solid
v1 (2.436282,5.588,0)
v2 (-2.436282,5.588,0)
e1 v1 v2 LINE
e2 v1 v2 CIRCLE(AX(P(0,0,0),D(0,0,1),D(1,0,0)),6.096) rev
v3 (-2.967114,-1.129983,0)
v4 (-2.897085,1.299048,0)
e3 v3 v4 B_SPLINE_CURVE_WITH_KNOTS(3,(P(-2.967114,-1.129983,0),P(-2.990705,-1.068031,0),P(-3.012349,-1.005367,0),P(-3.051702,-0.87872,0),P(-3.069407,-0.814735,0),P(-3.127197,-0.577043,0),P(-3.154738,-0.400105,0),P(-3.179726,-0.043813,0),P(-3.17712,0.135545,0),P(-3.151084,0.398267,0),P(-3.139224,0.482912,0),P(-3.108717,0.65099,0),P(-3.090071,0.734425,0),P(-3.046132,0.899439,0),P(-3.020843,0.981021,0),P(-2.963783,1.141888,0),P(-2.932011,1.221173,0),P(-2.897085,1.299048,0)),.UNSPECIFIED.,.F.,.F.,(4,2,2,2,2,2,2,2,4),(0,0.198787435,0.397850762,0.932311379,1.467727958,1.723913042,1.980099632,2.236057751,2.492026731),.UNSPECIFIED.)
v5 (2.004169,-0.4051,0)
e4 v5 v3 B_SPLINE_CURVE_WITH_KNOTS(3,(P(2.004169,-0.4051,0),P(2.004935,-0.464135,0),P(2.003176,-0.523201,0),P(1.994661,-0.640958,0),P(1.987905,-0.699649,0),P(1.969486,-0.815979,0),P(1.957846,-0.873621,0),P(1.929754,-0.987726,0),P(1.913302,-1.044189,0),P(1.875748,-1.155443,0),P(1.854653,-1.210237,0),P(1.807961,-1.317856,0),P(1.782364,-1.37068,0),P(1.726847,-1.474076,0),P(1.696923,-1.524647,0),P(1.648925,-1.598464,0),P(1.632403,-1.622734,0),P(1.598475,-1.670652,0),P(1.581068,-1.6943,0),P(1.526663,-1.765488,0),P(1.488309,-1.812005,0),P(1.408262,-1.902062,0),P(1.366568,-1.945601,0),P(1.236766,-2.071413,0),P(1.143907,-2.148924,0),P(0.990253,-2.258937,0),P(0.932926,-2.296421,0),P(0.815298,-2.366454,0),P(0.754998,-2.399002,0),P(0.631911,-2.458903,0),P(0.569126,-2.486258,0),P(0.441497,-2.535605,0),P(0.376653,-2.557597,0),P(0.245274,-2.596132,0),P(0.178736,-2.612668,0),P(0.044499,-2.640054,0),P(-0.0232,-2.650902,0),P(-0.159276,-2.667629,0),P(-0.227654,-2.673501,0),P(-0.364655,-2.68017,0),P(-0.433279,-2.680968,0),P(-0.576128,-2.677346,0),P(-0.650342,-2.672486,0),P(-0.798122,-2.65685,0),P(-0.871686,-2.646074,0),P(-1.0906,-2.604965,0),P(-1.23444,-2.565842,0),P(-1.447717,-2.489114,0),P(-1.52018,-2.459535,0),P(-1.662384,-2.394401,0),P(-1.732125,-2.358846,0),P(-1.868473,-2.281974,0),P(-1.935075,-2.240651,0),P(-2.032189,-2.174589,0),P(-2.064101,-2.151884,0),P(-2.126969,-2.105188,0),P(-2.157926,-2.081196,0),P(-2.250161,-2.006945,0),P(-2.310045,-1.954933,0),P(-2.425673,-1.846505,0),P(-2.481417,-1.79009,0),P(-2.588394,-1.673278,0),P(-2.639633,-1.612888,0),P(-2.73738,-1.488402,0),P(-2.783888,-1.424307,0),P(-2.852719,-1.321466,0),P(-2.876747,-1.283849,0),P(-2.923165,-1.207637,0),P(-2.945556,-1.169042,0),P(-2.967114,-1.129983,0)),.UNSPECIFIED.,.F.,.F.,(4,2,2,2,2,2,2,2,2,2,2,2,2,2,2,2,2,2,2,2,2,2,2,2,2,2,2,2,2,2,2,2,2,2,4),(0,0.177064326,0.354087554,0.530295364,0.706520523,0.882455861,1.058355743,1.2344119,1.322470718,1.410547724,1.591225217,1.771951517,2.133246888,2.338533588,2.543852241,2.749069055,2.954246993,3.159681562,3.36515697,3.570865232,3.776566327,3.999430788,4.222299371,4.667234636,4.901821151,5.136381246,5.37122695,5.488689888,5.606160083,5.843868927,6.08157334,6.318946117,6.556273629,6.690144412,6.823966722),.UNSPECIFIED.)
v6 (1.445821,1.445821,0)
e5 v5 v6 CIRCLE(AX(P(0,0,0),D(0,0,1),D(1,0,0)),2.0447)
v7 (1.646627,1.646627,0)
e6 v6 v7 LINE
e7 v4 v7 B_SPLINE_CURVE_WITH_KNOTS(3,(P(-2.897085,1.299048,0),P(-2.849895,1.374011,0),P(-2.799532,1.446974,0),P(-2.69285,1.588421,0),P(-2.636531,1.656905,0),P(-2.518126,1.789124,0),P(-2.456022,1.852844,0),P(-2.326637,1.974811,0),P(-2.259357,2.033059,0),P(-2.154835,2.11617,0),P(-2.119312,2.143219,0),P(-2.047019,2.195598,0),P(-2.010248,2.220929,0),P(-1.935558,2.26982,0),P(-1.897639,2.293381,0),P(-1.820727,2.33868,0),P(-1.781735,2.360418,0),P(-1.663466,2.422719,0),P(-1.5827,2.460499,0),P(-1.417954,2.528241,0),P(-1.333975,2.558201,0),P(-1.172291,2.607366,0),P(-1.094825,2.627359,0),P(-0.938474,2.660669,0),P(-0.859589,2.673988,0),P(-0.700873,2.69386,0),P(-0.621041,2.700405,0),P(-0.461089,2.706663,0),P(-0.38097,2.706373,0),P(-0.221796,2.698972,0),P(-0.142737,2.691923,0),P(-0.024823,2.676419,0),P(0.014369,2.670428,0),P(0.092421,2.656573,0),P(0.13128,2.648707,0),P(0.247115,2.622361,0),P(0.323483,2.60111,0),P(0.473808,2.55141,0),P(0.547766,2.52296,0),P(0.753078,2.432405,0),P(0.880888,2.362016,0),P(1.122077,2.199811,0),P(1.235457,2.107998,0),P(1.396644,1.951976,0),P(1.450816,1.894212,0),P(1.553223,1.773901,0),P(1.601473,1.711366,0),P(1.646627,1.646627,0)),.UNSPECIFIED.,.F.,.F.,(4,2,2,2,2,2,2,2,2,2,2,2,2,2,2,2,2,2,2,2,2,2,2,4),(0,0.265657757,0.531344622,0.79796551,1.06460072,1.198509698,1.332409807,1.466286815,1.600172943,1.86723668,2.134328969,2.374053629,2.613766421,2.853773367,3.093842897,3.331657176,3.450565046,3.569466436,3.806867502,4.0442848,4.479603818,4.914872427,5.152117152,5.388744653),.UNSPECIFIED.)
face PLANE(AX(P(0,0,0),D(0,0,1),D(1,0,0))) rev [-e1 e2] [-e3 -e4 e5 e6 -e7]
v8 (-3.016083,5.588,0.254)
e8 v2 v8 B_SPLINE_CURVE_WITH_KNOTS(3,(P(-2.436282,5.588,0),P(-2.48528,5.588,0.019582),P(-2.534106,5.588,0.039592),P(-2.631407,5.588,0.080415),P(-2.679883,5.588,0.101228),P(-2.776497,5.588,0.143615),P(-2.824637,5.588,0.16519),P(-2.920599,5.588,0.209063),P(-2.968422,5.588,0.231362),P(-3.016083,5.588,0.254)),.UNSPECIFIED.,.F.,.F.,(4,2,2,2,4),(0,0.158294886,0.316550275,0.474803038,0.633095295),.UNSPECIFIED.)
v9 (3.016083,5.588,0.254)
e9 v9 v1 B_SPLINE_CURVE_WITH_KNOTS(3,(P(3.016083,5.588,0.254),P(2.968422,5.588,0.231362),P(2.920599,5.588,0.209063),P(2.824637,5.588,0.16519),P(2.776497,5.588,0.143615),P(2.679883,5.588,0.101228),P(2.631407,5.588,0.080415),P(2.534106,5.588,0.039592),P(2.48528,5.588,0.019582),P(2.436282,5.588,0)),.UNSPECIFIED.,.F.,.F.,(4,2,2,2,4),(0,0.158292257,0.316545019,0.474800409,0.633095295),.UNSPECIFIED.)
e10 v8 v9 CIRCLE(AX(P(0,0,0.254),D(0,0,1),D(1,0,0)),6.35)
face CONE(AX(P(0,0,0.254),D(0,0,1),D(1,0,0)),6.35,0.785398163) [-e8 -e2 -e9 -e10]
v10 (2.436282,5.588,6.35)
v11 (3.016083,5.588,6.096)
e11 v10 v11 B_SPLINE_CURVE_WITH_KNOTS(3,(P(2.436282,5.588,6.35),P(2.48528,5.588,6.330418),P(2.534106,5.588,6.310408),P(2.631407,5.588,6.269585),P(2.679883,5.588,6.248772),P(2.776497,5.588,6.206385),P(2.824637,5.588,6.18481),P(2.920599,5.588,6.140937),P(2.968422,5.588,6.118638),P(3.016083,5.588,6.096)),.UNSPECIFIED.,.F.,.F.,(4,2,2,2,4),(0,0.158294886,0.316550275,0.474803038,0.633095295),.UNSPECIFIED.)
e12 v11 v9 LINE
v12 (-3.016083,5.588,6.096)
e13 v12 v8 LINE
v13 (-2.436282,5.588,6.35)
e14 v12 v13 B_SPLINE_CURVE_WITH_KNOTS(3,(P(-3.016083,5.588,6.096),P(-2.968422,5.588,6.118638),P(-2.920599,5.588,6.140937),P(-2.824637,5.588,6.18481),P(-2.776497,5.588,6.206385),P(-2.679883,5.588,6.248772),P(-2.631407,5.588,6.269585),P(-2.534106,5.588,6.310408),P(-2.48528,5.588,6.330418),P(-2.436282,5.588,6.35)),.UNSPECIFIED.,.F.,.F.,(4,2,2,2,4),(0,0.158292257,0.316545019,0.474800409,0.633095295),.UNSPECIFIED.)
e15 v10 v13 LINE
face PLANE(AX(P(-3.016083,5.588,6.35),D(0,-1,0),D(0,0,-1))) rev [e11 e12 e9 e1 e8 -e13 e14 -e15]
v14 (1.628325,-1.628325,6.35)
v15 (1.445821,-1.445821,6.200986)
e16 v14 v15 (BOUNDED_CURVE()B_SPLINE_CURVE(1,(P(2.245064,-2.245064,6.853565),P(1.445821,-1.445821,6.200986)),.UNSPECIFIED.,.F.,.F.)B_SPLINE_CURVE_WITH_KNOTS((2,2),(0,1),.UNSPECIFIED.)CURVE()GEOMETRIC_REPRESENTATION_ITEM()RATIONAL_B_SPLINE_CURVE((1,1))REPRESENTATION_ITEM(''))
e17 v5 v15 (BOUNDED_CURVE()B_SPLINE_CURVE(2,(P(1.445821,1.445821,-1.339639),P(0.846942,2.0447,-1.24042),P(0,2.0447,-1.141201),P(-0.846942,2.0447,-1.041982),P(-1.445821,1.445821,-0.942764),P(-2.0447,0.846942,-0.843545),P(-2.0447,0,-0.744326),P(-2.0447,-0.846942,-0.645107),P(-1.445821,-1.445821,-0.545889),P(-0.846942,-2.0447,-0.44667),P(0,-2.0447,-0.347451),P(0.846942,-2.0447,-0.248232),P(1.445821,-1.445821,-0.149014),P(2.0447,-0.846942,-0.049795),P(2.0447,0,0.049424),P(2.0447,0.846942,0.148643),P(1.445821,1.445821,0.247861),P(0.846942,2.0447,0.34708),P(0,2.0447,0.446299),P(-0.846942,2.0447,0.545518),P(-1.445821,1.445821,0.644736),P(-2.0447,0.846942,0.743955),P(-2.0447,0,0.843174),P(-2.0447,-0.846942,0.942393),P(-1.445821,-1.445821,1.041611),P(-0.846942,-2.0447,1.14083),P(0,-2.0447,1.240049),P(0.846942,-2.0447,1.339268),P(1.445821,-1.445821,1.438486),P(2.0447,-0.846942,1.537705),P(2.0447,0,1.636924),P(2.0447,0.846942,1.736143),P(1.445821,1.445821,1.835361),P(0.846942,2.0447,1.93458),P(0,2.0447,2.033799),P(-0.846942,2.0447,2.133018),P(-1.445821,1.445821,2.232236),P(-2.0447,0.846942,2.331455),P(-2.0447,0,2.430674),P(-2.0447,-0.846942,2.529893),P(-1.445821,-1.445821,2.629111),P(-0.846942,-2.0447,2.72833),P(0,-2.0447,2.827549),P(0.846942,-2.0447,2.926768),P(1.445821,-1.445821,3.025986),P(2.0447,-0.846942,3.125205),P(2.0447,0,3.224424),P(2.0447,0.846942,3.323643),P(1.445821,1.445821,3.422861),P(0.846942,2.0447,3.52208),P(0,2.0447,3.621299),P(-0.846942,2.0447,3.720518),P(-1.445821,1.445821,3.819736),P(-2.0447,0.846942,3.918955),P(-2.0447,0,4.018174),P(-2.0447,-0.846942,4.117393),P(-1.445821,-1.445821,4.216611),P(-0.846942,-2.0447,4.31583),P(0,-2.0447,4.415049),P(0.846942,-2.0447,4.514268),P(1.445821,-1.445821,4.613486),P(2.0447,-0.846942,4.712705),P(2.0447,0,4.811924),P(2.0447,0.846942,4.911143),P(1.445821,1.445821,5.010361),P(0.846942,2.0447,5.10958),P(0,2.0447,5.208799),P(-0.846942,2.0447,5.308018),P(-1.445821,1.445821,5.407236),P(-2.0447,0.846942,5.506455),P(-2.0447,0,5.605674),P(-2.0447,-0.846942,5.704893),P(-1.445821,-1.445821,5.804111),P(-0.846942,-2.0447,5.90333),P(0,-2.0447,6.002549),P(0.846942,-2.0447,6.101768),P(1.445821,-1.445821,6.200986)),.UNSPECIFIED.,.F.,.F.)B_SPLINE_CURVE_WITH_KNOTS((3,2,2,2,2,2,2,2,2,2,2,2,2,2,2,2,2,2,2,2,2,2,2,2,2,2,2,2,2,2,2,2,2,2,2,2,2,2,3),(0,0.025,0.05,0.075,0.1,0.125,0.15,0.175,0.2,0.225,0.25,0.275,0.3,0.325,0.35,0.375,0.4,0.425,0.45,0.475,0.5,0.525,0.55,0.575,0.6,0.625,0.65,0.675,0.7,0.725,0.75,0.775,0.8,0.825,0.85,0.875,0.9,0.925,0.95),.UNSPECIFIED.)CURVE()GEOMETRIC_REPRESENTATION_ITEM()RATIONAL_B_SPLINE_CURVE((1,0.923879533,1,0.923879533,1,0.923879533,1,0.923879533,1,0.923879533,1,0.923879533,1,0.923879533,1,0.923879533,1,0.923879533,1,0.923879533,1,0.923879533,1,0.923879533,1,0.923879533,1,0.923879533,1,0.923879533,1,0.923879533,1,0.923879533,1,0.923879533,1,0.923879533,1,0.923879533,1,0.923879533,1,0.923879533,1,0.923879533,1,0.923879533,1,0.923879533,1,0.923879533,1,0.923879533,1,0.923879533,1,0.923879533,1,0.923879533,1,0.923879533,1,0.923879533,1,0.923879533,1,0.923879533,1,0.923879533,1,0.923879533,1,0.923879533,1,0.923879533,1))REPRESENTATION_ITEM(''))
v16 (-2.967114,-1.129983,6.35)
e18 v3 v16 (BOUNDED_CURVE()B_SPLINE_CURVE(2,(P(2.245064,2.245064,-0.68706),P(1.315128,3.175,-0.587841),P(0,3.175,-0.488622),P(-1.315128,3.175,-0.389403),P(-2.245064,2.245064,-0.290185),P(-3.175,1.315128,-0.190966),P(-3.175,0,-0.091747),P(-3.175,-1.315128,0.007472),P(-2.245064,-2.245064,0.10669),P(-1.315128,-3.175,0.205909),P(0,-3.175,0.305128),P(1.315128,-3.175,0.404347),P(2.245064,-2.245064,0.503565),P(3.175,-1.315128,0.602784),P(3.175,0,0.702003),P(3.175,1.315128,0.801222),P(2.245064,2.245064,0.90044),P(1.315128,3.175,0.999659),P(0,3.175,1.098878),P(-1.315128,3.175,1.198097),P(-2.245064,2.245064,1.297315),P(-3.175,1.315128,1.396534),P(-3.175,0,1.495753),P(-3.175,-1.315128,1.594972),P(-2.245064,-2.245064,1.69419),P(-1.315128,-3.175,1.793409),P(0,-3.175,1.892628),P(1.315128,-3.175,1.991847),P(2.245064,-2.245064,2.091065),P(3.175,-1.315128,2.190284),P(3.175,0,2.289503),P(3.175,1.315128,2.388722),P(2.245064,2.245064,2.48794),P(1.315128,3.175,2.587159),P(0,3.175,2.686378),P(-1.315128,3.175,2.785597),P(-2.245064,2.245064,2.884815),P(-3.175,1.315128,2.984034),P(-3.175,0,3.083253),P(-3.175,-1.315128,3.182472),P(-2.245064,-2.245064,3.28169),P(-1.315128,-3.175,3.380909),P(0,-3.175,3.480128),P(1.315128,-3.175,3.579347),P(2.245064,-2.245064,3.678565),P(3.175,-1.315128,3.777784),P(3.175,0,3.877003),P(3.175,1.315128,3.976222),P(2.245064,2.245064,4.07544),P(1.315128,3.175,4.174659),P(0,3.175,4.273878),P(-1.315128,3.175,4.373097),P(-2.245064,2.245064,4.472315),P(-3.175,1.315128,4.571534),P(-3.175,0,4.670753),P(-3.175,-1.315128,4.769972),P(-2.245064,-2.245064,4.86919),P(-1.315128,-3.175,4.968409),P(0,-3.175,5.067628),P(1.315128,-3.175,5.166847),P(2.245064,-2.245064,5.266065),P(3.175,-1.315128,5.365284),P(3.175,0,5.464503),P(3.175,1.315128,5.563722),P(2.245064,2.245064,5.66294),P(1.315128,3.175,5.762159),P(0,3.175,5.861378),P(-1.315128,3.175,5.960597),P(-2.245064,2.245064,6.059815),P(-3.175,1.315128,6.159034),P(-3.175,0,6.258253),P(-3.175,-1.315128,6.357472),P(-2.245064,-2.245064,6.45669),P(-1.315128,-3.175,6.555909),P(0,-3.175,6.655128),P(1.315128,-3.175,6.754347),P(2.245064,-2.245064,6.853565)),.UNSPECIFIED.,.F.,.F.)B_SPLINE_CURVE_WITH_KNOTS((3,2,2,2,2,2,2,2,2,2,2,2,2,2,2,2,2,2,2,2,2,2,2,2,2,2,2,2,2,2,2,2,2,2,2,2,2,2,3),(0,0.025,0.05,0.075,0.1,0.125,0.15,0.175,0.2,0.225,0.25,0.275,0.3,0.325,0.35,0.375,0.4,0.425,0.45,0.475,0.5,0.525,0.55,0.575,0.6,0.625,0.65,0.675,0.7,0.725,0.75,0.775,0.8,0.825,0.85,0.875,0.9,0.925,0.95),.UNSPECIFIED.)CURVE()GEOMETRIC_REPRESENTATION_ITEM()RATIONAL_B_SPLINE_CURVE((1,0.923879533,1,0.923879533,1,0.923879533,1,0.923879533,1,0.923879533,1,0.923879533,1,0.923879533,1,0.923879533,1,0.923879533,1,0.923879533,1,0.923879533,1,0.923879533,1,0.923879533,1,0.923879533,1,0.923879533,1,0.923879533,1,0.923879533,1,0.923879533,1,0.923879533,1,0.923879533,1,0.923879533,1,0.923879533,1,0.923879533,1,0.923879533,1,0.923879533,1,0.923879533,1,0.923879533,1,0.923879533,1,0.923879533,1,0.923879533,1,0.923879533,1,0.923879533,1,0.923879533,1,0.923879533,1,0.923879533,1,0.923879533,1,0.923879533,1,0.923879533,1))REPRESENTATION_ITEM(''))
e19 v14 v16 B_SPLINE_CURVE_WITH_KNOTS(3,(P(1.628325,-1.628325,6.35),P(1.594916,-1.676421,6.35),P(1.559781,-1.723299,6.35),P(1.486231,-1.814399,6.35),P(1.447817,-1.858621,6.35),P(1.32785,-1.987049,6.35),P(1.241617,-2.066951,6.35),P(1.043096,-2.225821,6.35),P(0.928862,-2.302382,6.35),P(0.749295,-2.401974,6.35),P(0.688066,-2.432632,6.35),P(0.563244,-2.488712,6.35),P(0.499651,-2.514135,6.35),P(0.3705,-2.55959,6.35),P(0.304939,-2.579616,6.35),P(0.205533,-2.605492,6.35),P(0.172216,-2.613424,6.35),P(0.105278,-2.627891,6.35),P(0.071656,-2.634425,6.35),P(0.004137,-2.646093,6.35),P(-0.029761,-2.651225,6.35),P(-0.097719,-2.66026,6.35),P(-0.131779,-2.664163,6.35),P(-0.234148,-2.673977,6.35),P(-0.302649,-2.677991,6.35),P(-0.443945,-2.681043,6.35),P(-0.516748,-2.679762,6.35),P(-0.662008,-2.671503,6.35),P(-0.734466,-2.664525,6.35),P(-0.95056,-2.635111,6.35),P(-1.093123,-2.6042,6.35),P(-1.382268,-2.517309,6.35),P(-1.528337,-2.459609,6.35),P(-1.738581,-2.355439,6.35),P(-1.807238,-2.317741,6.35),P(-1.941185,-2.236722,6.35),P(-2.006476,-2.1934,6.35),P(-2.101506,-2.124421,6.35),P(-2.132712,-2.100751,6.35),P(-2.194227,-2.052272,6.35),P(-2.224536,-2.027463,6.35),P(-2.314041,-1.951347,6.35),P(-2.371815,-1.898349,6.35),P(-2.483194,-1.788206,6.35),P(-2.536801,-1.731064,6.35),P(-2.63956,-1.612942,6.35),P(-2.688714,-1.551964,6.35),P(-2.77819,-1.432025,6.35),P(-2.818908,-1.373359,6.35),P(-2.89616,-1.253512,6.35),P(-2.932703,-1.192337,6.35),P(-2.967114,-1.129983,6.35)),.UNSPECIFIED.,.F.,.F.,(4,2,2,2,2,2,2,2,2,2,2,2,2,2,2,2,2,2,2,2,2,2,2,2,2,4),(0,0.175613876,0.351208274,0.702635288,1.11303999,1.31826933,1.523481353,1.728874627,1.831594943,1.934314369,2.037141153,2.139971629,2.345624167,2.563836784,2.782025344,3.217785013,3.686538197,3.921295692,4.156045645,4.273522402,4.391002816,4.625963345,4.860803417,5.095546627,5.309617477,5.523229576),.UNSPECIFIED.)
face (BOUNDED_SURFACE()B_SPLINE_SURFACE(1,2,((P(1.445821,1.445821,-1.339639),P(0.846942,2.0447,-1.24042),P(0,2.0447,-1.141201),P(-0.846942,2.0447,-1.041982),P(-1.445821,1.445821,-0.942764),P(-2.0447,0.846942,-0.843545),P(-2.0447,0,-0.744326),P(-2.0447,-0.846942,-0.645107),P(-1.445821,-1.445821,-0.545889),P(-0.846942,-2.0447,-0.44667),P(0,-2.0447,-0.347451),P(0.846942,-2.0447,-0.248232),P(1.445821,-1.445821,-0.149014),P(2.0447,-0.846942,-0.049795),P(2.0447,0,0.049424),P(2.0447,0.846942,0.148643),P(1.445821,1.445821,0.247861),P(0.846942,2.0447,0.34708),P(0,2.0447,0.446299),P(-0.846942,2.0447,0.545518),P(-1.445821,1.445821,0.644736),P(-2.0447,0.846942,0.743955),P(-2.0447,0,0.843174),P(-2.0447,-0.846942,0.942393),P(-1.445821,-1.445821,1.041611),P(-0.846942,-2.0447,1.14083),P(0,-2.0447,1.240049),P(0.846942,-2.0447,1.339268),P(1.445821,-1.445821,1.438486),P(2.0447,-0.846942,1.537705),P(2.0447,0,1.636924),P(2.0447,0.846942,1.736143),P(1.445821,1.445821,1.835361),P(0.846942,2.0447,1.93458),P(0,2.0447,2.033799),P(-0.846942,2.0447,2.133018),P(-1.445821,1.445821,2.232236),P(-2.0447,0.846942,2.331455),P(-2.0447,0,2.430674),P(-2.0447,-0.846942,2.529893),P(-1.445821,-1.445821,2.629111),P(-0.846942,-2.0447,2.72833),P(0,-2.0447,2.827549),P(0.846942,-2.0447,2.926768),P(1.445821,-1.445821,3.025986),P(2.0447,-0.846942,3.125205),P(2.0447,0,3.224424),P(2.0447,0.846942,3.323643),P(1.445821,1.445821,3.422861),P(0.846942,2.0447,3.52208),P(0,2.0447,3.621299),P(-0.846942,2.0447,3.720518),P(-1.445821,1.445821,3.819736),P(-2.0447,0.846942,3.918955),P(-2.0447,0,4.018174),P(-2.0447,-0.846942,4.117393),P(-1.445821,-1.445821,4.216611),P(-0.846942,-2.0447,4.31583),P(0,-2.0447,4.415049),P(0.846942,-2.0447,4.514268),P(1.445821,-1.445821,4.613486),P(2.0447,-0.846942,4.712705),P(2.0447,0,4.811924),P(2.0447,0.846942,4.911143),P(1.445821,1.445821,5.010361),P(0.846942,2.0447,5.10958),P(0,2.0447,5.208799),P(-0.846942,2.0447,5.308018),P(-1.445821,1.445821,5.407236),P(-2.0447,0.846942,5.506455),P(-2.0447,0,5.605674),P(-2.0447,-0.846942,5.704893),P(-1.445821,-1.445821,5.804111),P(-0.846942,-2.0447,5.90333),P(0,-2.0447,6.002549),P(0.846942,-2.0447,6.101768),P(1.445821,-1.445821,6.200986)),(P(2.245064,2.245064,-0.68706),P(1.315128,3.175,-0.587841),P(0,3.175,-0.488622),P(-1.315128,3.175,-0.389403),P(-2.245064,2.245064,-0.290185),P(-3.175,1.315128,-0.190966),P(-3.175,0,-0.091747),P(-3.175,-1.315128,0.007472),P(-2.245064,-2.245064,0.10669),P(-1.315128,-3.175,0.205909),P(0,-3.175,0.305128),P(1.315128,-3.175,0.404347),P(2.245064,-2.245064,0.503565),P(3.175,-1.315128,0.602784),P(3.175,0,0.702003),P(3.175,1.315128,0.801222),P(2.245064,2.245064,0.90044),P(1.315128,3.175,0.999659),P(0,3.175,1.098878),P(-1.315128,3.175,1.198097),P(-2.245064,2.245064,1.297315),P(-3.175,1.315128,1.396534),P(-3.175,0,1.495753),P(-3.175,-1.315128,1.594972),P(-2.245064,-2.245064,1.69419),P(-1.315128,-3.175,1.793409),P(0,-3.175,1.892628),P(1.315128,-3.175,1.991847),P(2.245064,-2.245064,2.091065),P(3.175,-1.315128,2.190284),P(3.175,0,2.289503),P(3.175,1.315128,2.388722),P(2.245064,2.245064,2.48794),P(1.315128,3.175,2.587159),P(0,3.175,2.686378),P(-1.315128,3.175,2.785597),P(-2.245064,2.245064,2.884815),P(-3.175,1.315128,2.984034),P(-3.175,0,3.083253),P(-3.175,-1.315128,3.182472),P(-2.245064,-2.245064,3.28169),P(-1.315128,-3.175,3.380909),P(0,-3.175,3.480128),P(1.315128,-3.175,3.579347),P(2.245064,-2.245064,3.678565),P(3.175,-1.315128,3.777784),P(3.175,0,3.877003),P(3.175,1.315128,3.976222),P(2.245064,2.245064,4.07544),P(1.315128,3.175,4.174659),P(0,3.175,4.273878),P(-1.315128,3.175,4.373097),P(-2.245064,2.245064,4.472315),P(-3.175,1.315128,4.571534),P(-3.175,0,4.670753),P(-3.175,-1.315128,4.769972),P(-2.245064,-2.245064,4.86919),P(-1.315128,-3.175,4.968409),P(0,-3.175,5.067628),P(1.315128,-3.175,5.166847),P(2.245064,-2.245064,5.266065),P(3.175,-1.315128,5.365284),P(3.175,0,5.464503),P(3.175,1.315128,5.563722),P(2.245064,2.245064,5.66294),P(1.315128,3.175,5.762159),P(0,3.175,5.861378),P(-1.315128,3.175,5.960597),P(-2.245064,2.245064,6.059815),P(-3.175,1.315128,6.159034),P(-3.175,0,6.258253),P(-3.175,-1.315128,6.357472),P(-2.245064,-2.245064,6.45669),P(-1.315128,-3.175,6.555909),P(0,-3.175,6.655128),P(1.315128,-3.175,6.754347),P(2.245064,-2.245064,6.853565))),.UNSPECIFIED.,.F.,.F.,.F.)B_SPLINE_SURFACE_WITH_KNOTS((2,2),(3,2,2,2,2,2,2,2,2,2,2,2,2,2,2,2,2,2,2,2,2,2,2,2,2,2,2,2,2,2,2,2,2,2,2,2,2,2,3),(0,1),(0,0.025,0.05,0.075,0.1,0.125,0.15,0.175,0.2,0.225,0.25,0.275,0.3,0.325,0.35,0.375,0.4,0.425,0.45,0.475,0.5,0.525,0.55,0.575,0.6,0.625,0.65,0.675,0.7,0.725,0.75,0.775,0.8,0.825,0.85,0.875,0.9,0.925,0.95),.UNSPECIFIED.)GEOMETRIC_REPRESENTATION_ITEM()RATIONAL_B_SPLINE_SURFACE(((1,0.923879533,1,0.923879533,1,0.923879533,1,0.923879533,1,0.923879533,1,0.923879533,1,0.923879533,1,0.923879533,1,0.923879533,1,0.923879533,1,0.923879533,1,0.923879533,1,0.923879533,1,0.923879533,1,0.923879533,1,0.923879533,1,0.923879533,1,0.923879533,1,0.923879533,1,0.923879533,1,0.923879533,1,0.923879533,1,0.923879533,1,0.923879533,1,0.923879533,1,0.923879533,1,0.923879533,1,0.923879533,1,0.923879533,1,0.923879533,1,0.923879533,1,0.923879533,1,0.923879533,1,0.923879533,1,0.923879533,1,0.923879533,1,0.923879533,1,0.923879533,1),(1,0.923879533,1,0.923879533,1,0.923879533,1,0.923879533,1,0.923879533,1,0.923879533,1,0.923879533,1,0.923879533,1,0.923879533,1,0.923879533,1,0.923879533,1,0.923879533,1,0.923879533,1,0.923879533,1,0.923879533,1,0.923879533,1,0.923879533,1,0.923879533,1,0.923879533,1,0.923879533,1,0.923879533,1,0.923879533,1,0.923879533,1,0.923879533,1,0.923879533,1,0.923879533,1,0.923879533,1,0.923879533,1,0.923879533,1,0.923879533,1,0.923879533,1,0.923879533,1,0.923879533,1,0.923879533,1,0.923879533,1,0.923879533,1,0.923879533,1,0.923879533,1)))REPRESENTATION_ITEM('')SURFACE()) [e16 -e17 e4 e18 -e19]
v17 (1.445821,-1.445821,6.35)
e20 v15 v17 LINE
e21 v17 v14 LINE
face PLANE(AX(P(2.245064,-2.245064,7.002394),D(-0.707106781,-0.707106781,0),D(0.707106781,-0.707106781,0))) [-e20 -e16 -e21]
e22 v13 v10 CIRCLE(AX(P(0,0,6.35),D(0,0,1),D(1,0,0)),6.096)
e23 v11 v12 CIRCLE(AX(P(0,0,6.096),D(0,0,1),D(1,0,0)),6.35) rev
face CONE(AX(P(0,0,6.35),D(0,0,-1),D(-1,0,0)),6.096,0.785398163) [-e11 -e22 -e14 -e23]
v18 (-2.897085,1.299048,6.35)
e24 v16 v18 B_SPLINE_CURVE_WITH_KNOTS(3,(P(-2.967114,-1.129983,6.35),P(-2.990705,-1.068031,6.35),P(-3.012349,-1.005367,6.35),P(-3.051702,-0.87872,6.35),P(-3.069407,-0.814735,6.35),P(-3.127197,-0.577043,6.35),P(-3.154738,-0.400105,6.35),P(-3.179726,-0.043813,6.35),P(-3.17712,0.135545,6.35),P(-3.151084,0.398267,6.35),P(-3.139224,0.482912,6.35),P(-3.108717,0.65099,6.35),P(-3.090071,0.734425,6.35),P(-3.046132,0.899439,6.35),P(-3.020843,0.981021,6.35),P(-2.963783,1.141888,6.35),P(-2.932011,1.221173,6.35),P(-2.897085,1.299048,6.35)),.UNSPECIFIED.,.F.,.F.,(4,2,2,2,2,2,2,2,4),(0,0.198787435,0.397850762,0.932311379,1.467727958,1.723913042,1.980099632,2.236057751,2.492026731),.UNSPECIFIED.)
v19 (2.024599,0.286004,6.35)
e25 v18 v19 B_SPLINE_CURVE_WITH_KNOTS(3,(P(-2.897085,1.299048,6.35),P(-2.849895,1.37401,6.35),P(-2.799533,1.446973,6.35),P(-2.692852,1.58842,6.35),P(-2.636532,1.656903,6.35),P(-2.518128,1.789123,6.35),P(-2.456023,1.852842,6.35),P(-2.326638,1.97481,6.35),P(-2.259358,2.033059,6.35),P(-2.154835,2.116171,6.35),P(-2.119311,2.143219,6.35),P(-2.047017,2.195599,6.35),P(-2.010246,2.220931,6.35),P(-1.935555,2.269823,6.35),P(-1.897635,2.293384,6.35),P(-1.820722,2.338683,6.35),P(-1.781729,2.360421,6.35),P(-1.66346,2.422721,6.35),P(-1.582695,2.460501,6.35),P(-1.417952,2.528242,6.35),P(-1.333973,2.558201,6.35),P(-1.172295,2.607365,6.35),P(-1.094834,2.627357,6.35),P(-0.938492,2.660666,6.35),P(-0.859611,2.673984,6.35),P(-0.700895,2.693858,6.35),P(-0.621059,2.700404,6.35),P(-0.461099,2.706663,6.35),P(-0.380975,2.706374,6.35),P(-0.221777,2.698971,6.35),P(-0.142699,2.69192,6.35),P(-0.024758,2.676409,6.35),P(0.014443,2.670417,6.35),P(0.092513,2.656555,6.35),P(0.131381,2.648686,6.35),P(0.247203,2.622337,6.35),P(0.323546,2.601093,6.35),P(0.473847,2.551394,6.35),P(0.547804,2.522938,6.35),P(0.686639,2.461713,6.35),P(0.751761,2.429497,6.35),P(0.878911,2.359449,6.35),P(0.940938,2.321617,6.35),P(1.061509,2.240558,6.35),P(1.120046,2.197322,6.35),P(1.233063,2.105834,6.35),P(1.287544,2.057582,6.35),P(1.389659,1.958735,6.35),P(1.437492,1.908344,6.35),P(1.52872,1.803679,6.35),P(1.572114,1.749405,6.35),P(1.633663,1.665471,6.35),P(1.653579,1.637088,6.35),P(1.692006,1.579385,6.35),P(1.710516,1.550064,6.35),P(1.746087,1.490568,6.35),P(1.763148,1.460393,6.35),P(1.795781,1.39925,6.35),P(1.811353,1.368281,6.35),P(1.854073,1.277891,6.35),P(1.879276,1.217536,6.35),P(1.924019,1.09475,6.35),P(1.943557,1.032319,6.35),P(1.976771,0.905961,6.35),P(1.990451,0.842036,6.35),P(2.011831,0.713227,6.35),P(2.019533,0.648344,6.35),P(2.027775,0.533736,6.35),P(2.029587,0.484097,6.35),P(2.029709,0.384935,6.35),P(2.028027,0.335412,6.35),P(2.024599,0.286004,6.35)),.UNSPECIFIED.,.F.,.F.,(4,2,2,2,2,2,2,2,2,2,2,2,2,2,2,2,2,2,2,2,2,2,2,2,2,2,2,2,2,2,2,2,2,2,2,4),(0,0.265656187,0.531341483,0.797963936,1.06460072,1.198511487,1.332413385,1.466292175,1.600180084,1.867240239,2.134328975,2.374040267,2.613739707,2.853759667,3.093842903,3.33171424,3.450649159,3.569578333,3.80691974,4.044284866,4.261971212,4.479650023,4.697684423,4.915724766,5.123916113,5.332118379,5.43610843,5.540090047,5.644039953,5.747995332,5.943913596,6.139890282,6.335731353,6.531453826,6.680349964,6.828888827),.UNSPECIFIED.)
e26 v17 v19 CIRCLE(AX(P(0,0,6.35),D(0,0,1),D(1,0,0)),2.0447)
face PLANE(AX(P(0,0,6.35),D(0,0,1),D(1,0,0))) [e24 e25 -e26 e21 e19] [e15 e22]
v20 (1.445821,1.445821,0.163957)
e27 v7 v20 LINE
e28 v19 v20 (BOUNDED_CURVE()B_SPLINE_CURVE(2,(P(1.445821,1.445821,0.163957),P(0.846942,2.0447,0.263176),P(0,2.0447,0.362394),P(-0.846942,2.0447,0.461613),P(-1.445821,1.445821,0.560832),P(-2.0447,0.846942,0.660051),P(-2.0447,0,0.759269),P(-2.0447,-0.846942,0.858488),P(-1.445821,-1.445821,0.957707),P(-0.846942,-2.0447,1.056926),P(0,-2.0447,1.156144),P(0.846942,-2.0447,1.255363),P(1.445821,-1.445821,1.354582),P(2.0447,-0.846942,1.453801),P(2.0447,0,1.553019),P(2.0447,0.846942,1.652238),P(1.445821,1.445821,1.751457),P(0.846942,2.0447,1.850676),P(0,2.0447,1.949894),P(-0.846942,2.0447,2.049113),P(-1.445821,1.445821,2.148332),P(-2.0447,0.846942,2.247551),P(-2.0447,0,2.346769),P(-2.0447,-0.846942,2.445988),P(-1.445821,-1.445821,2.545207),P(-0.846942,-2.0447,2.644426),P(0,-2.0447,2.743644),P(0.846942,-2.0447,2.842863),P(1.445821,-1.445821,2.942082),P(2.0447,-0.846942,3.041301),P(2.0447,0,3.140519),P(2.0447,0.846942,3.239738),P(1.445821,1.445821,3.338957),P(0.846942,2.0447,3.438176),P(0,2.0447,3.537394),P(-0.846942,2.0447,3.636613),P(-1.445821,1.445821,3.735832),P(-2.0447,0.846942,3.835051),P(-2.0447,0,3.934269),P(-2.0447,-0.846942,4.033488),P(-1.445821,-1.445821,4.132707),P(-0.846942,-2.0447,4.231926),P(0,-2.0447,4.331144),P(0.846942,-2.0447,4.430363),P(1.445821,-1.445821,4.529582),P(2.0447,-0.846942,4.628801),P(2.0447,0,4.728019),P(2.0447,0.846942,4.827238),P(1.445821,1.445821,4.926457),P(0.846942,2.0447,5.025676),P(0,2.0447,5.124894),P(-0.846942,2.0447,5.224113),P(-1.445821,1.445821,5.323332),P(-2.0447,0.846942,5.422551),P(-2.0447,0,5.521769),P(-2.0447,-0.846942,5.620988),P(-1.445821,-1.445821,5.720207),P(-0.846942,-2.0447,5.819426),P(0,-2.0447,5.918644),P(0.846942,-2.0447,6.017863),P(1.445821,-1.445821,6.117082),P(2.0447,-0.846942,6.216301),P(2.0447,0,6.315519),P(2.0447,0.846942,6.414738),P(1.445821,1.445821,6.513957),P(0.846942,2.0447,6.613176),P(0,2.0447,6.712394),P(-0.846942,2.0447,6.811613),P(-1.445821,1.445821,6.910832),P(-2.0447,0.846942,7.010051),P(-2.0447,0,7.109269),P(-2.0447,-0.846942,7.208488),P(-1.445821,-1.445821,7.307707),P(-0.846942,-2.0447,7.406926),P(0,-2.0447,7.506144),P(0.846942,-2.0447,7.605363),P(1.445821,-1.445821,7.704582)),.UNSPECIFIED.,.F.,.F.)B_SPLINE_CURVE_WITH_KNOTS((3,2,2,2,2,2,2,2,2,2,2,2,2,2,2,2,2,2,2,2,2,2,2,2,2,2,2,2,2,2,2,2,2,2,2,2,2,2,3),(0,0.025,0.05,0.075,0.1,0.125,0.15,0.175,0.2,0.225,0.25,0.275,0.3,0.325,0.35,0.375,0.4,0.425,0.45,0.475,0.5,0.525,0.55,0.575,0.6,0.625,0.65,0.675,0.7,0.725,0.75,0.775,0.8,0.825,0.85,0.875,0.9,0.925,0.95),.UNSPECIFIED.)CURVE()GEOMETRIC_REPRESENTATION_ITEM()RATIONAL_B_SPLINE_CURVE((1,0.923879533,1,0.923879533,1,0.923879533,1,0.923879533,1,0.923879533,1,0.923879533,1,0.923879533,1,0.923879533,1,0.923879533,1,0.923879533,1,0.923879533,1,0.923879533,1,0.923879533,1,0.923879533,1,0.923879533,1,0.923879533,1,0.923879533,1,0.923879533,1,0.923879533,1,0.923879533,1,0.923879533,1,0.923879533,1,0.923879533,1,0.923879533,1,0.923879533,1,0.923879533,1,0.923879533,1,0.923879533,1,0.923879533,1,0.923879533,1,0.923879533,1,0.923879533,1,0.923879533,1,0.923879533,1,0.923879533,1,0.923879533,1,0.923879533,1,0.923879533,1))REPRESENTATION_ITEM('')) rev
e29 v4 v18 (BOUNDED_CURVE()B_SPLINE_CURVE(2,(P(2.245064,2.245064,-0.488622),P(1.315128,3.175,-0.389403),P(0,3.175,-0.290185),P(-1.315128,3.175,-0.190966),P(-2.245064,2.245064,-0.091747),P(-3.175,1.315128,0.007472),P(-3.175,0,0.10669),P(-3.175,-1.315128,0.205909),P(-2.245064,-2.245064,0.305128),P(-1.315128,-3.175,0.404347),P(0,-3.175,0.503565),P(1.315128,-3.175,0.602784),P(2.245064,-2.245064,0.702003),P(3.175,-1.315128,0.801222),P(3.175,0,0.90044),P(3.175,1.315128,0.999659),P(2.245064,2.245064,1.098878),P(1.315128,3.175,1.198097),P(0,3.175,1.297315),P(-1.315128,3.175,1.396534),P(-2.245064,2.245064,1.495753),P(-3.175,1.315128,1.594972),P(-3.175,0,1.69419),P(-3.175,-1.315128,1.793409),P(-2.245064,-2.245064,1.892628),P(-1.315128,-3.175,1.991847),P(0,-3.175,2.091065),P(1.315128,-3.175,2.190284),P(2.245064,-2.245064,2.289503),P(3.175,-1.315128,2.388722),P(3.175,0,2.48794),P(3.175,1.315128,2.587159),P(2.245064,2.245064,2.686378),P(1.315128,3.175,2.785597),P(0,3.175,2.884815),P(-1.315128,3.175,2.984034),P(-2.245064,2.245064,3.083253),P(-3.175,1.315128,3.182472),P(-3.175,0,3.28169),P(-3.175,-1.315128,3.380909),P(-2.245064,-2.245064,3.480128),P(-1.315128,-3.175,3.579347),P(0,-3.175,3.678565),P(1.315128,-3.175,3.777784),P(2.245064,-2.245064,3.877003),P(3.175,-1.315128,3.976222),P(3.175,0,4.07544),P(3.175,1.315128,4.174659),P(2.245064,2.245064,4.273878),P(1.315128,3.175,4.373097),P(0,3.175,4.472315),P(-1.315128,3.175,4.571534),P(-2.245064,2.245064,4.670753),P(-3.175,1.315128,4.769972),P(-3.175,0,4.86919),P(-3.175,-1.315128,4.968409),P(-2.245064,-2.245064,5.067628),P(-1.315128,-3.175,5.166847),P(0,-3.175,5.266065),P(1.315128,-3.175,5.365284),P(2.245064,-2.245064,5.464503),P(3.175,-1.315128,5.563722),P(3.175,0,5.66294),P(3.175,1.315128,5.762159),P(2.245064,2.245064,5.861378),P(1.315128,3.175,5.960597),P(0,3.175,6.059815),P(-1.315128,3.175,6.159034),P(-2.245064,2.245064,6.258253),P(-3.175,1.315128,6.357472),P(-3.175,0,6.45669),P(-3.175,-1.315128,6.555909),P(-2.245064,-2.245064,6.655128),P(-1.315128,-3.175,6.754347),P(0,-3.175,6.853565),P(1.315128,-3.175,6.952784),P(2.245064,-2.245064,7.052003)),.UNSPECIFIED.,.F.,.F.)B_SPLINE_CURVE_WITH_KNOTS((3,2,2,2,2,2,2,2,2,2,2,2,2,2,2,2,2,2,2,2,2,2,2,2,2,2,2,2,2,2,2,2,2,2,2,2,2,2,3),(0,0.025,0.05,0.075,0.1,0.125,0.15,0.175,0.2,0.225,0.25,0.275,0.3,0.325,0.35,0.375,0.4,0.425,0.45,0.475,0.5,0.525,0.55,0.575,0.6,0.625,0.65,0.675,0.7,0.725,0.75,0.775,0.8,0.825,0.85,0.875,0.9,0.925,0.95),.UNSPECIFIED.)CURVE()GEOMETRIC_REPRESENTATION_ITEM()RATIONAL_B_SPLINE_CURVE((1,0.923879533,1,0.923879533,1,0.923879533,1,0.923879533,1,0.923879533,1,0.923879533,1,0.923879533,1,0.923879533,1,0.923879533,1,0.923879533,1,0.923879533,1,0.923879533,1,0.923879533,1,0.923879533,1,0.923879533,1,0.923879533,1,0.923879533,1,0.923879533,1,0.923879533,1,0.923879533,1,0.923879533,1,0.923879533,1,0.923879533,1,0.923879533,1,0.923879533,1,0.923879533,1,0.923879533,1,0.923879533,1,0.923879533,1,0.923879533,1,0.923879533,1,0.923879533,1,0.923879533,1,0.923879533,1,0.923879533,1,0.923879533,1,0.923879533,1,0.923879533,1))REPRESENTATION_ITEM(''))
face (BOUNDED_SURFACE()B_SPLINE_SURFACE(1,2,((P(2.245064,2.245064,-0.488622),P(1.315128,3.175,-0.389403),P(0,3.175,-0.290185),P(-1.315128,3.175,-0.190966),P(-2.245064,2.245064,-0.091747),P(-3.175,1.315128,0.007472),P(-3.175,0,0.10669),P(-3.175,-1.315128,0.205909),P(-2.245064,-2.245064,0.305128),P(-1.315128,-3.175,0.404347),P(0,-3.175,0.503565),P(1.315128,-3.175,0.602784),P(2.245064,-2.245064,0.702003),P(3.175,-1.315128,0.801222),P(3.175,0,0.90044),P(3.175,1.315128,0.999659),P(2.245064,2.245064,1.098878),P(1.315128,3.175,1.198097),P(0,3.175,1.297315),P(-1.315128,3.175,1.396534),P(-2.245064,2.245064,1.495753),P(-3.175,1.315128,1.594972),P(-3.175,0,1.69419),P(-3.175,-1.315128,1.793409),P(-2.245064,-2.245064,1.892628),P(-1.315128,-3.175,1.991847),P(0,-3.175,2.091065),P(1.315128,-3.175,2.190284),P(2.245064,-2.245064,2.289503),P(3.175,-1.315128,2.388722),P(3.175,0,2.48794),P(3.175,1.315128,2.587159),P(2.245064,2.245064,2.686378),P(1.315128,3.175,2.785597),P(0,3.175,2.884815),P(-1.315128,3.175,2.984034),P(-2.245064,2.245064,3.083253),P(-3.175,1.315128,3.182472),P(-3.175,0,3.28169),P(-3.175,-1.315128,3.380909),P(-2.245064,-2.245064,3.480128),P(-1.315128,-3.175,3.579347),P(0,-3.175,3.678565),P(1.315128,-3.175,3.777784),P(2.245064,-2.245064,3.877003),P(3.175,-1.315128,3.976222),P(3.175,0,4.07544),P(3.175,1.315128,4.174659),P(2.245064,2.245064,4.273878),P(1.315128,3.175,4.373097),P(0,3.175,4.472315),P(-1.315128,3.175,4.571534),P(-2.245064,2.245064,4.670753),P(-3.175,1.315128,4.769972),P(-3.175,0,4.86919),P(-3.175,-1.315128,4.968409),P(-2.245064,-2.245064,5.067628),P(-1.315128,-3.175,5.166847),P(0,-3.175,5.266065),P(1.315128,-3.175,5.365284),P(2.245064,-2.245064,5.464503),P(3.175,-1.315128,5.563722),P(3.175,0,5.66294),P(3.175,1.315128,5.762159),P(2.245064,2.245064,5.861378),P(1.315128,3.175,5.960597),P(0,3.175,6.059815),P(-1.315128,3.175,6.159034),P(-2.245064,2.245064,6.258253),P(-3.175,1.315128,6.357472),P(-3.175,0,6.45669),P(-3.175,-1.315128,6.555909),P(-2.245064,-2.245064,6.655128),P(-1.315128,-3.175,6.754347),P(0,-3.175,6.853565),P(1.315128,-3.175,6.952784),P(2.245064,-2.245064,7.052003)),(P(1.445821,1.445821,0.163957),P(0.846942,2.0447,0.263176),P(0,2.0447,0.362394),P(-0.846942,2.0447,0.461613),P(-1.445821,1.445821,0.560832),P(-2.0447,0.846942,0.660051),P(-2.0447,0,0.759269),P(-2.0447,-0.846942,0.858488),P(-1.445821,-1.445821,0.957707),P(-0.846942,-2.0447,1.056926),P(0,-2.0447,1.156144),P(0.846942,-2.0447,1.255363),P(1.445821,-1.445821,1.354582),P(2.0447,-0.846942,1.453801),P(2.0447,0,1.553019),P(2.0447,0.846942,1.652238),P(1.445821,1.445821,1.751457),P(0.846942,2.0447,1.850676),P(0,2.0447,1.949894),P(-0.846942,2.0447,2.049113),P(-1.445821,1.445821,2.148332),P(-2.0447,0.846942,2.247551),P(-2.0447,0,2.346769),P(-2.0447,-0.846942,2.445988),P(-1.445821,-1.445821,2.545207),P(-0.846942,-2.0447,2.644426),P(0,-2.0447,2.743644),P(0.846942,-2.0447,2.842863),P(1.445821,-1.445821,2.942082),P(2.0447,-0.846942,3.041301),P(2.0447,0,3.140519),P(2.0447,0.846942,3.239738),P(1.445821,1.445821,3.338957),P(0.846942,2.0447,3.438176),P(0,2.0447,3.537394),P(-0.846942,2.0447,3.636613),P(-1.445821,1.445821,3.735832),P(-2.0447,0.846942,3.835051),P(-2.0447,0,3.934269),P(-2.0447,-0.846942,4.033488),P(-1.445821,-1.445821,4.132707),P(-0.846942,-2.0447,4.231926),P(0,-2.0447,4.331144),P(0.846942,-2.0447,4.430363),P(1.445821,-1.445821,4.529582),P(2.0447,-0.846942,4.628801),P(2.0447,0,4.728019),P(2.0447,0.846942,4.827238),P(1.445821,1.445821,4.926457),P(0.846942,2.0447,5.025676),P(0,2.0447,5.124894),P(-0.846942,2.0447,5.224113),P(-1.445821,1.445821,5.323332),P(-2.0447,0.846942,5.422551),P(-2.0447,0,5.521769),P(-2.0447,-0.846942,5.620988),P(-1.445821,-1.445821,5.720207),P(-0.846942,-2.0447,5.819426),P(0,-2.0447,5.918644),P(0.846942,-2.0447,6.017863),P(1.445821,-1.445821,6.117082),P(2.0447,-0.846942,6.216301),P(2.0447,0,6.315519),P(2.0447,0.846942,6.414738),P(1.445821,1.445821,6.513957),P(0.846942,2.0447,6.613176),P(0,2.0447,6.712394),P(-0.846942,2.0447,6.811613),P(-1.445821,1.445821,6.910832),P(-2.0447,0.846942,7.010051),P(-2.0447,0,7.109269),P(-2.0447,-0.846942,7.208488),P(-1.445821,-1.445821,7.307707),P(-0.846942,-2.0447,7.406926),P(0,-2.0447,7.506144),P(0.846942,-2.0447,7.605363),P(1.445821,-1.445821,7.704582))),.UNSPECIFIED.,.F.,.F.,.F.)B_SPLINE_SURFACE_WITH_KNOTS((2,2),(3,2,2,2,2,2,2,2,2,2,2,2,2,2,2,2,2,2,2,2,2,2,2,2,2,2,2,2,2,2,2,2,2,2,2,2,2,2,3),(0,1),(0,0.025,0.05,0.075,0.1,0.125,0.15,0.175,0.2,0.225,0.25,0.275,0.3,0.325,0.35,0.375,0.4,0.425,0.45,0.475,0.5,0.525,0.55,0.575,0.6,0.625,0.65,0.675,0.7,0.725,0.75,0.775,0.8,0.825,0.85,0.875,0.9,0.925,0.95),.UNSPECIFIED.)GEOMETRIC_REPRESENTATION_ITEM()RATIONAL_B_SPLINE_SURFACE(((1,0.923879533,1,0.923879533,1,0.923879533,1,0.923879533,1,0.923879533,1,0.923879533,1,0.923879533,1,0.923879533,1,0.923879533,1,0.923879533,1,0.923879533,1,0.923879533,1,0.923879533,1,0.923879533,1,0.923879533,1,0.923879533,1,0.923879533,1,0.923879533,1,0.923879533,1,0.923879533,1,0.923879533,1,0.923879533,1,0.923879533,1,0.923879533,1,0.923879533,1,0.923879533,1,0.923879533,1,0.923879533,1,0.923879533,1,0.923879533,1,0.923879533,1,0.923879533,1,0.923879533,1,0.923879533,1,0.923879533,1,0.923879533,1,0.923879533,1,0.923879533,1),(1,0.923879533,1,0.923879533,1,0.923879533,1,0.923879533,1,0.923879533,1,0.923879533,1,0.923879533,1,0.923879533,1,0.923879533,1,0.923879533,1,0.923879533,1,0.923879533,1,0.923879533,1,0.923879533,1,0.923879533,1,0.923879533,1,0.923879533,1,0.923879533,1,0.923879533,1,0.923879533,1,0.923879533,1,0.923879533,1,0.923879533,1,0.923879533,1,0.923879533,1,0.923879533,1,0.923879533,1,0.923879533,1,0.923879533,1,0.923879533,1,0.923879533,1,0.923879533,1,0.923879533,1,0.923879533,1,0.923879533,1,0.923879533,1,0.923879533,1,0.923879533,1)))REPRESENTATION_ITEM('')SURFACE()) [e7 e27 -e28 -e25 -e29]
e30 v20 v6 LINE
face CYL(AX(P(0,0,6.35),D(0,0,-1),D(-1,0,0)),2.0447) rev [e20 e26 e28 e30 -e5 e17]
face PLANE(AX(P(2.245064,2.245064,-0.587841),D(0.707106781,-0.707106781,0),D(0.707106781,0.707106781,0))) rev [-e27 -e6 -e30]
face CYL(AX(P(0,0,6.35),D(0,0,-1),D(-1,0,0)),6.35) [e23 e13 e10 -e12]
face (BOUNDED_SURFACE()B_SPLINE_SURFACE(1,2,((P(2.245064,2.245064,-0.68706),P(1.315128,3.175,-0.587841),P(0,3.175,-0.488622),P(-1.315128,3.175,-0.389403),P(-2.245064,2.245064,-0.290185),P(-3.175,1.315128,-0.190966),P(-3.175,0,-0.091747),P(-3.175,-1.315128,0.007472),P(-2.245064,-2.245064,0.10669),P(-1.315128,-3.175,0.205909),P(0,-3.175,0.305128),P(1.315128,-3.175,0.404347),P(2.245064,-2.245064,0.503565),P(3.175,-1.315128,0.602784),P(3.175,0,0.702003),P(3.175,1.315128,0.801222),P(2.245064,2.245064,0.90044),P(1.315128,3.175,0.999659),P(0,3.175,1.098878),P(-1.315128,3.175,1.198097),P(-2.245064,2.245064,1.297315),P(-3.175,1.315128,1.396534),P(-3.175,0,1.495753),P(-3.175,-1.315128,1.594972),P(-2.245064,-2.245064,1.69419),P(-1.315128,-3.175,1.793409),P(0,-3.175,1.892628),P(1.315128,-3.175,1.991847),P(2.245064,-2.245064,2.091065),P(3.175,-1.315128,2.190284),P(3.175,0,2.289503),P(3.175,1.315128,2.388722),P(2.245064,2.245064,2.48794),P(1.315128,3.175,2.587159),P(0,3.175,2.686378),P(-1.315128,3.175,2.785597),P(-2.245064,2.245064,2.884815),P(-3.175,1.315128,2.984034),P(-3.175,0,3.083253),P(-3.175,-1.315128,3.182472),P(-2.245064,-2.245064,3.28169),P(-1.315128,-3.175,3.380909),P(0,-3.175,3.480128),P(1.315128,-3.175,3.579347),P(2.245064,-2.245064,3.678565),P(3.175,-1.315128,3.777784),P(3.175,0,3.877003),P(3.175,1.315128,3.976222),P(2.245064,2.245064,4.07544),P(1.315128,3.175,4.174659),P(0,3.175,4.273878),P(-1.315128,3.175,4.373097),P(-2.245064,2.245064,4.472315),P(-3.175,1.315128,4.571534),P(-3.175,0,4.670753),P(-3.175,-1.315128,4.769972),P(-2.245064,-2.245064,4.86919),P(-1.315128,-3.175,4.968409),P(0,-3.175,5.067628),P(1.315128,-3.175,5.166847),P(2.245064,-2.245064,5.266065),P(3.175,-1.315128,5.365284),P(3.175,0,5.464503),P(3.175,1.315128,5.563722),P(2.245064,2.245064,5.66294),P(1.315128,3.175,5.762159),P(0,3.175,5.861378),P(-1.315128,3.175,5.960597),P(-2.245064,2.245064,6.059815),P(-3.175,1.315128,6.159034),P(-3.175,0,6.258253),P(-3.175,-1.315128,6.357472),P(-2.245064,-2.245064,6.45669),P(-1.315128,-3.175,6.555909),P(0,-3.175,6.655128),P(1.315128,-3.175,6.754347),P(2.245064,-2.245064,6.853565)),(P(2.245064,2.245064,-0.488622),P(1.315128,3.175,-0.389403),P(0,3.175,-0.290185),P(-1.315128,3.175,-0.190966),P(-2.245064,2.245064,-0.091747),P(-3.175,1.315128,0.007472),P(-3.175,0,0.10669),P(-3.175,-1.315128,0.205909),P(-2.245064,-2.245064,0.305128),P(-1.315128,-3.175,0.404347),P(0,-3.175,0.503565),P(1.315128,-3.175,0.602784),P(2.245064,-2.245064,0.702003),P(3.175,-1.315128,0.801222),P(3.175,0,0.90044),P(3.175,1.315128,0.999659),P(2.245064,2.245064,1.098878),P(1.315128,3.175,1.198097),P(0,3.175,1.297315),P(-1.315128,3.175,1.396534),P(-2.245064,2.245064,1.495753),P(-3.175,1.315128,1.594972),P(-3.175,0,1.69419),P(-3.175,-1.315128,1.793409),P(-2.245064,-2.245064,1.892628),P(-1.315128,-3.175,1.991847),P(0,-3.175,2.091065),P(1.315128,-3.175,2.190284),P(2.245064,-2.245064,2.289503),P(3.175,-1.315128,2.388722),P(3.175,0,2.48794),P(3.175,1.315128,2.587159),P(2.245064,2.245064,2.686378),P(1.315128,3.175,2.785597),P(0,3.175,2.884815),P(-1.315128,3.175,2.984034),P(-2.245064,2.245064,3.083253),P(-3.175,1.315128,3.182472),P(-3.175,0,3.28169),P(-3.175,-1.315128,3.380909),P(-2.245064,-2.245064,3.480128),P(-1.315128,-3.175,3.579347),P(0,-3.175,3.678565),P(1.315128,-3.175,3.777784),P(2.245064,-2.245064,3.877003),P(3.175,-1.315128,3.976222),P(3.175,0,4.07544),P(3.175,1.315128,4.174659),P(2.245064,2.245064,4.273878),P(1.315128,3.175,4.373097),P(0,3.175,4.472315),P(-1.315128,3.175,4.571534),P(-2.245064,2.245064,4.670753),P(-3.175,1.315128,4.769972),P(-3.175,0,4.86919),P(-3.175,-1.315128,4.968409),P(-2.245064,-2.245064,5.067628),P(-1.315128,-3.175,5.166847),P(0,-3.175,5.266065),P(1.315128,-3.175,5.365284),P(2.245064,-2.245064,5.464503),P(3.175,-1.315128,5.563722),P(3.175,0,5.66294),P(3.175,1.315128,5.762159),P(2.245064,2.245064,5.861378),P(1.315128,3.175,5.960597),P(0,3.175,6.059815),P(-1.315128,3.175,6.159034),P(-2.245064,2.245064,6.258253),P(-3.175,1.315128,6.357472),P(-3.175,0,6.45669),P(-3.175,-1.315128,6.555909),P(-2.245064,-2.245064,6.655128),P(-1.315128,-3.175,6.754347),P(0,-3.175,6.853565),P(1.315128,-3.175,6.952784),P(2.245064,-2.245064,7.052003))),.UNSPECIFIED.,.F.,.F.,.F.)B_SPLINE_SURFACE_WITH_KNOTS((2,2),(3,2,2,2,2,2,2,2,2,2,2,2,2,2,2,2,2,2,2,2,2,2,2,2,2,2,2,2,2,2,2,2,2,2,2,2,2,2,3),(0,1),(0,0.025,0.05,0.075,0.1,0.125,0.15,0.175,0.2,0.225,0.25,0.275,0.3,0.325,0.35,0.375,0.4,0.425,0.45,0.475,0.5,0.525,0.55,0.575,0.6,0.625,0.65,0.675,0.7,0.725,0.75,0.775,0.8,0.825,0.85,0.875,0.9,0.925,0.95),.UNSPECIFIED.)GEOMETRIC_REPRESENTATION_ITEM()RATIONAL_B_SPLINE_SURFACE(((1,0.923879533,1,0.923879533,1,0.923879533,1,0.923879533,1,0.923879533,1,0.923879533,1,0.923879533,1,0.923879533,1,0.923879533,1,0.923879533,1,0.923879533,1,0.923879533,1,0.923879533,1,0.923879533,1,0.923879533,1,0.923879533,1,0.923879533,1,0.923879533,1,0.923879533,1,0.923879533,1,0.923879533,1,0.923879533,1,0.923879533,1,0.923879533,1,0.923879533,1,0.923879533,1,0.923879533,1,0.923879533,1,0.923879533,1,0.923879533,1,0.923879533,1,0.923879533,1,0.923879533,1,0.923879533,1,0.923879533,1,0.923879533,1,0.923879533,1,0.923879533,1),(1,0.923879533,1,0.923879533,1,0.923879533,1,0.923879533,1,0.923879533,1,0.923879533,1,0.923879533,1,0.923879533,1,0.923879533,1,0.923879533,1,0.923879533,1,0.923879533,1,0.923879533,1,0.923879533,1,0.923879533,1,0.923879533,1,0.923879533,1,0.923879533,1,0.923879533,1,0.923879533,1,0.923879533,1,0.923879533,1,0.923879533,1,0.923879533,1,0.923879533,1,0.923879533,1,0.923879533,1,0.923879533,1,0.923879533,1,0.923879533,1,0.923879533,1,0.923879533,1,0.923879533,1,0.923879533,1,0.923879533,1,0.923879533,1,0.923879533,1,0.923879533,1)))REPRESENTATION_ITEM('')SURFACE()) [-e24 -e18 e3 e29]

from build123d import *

# Parameters (mm, degrees)
SKETCH1_R           = 2.0447
BOSS_EXTRUDE1_DEPTH = 6.35
CUT_SWEEP1_PITCH    = 1.5875
CHAMFER1_SIZE       = 0.254


with BuildPart() as part:
    # Sketch1 → Boss-Extrude1 (new body)
    with BuildSketch(Plane.XY):
        with BuildLine():
            Line((-3.01608289, 5.588), (3.01608289, 5.588))
            ThreePointArc((3.01608289, 5.588), (0, -6.35), (-3.01608289, 5.588))
        make_face()
        Circle(SKETCH1_R, mode=Mode.SUBTRACT)
    extrude(amount=BOSS_EXTRUDE1_DEPTH)

    # Cut-Sweep1: arcs per turn and ends read off the stored shape
    # Cut-Sweep1: the profile of Sketch2 profile screwed along a right-hand helix through 4.75 turns, 8 arcs to a turn; built about Z, then put on its axis
    cut_sweep1_z = Axis((0, 0, 0), (0, 0, 1))
    cut_sweep1_corners = [(2.0444, 0, -1.339811764), (3.175, 0, -0.68705955), (3.175, 0, -0.48862205), (2.0444, 0, 0.164130164)]
    with BuildLine(mode=Mode.PRIVATE) as cut_sweep1_profile:
        Line(cut_sweep1_corners[0], cut_sweep1_corners[1])
        Line(cut_sweep1_corners[1], cut_sweep1_corners[2])
        Line(cut_sweep1_corners[2], cut_sweep1_corners[3])
        Line(cut_sweep1_corners[3], cut_sweep1_corners[0])
    cut_sweep1_cap = Face(cut_sweep1_profile.wire())
    cut_sweep1_turn_angles = [0, 22.5, 45, 67.5, 90, 112.5, 135, 157.5, 180, 202.5, 225, 247.5, 270, 292.5, 315, 337.5, 360]
    cut_sweep1_turn_weights = [1, 0.9238795325112867, 1, 0.9238795325112867, 1, 0.9238795325112867, 1, 0.9238795325112867, 1, 0.9238795325112867, 1, 0.9238795325112867, 1, 0.9238795325112867, 1, 0.9238795325112867, 1]
    cut_sweep1_turn_rails = [Edge.make_bspline([Vector(p[0], p[1], 0).rotate(cut_sweep1_z, cut_sweep1_turn_angles[k]) / cut_sweep1_turn_weights[k] + Vector(0, 0, p[2] + CUT_SWEEP1_PITCH * cut_sweep1_turn_angles[k] / 360) for k in range(17)], [0, 0, 0, 1, 1, 2, 2, 3, 3, 4, 4, 5, 5, 6, 6, 7, 7, 8, 8, 8], 2, cut_sweep1_turn_weights) for p in cut_sweep1_corners]
    cut_sweep1_turn_sides = [Face.make_surface_from_curves(cut_sweep1_turn_rails[p[0]], cut_sweep1_turn_rails[p[1]]) for p in [(0, 1), (1, 2), (2, 3), (3, 0)]]
    cut_sweep1_last_angles = [1440, 1462.5, 1485, 1507.5, 1530, 1552.5, 1575, 1597.5, 1620, 1642.5, 1665, 1687.5, 1710]
    cut_sweep1_last_weights = [1, 0.9238795325112867, 1, 0.9238795325112867, 1, 0.9238795325112867, 1, 0.9238795325112867, 1, 0.9238795325112867, 1, 0.9238795325112769, 1]
    cut_sweep1_last_rails = [Edge.make_bspline([Vector(p[0], p[1], 0).rotate(cut_sweep1_z, cut_sweep1_last_angles[k]) / cut_sweep1_last_weights[k] + Vector(0, 0, p[2] + CUT_SWEEP1_PITCH * cut_sweep1_last_angles[k] / 360) for k in range(13)], [0, 0, 0, 1, 1, 2, 2, 3, 3, 4, 4, 5, 5, 6, 6, 6], 2, cut_sweep1_last_weights) for p in cut_sweep1_corners]
    cut_sweep1_last_sides = [Face.make_surface_from_curves(cut_sweep1_last_rails[p[0]], cut_sweep1_last_rails[p[1]]) for p in [(0, 1), (1, 2), (2, 3), (3, 0)]]
    cut_sweep1 = Plane(origin=(0, 0, 0), x_dir=(0.7071067811865512, 0.7071067811865438, 0), z_dir=(0, 0, 1)) * Solid(Shell([*[p.moved(Location((0, 0, CUT_SWEEP1_PITCH * i))) for i in range(4) for p in cut_sweep1_turn_sides], *cut_sweep1_last_sides, cut_sweep1_cap, cut_sweep1_cap.rotate(cut_sweep1_z, 1710).moved(Location((0, 0, CUT_SWEEP1_PITCH * 1710 / 360)))]))
    add(cut_sweep1, mode=Mode.SUBTRACT)

    # Chamfer1
    chamfer1_edges = [part.edges().sort_by_distance(p)[0] for p in [
        (0, -6.35, 0),
        (0, -6.35, 6.35),
    ]]
    chamfer(chamfer1_edges, length=CHAMFER1_SIZE)


solid = part.part
